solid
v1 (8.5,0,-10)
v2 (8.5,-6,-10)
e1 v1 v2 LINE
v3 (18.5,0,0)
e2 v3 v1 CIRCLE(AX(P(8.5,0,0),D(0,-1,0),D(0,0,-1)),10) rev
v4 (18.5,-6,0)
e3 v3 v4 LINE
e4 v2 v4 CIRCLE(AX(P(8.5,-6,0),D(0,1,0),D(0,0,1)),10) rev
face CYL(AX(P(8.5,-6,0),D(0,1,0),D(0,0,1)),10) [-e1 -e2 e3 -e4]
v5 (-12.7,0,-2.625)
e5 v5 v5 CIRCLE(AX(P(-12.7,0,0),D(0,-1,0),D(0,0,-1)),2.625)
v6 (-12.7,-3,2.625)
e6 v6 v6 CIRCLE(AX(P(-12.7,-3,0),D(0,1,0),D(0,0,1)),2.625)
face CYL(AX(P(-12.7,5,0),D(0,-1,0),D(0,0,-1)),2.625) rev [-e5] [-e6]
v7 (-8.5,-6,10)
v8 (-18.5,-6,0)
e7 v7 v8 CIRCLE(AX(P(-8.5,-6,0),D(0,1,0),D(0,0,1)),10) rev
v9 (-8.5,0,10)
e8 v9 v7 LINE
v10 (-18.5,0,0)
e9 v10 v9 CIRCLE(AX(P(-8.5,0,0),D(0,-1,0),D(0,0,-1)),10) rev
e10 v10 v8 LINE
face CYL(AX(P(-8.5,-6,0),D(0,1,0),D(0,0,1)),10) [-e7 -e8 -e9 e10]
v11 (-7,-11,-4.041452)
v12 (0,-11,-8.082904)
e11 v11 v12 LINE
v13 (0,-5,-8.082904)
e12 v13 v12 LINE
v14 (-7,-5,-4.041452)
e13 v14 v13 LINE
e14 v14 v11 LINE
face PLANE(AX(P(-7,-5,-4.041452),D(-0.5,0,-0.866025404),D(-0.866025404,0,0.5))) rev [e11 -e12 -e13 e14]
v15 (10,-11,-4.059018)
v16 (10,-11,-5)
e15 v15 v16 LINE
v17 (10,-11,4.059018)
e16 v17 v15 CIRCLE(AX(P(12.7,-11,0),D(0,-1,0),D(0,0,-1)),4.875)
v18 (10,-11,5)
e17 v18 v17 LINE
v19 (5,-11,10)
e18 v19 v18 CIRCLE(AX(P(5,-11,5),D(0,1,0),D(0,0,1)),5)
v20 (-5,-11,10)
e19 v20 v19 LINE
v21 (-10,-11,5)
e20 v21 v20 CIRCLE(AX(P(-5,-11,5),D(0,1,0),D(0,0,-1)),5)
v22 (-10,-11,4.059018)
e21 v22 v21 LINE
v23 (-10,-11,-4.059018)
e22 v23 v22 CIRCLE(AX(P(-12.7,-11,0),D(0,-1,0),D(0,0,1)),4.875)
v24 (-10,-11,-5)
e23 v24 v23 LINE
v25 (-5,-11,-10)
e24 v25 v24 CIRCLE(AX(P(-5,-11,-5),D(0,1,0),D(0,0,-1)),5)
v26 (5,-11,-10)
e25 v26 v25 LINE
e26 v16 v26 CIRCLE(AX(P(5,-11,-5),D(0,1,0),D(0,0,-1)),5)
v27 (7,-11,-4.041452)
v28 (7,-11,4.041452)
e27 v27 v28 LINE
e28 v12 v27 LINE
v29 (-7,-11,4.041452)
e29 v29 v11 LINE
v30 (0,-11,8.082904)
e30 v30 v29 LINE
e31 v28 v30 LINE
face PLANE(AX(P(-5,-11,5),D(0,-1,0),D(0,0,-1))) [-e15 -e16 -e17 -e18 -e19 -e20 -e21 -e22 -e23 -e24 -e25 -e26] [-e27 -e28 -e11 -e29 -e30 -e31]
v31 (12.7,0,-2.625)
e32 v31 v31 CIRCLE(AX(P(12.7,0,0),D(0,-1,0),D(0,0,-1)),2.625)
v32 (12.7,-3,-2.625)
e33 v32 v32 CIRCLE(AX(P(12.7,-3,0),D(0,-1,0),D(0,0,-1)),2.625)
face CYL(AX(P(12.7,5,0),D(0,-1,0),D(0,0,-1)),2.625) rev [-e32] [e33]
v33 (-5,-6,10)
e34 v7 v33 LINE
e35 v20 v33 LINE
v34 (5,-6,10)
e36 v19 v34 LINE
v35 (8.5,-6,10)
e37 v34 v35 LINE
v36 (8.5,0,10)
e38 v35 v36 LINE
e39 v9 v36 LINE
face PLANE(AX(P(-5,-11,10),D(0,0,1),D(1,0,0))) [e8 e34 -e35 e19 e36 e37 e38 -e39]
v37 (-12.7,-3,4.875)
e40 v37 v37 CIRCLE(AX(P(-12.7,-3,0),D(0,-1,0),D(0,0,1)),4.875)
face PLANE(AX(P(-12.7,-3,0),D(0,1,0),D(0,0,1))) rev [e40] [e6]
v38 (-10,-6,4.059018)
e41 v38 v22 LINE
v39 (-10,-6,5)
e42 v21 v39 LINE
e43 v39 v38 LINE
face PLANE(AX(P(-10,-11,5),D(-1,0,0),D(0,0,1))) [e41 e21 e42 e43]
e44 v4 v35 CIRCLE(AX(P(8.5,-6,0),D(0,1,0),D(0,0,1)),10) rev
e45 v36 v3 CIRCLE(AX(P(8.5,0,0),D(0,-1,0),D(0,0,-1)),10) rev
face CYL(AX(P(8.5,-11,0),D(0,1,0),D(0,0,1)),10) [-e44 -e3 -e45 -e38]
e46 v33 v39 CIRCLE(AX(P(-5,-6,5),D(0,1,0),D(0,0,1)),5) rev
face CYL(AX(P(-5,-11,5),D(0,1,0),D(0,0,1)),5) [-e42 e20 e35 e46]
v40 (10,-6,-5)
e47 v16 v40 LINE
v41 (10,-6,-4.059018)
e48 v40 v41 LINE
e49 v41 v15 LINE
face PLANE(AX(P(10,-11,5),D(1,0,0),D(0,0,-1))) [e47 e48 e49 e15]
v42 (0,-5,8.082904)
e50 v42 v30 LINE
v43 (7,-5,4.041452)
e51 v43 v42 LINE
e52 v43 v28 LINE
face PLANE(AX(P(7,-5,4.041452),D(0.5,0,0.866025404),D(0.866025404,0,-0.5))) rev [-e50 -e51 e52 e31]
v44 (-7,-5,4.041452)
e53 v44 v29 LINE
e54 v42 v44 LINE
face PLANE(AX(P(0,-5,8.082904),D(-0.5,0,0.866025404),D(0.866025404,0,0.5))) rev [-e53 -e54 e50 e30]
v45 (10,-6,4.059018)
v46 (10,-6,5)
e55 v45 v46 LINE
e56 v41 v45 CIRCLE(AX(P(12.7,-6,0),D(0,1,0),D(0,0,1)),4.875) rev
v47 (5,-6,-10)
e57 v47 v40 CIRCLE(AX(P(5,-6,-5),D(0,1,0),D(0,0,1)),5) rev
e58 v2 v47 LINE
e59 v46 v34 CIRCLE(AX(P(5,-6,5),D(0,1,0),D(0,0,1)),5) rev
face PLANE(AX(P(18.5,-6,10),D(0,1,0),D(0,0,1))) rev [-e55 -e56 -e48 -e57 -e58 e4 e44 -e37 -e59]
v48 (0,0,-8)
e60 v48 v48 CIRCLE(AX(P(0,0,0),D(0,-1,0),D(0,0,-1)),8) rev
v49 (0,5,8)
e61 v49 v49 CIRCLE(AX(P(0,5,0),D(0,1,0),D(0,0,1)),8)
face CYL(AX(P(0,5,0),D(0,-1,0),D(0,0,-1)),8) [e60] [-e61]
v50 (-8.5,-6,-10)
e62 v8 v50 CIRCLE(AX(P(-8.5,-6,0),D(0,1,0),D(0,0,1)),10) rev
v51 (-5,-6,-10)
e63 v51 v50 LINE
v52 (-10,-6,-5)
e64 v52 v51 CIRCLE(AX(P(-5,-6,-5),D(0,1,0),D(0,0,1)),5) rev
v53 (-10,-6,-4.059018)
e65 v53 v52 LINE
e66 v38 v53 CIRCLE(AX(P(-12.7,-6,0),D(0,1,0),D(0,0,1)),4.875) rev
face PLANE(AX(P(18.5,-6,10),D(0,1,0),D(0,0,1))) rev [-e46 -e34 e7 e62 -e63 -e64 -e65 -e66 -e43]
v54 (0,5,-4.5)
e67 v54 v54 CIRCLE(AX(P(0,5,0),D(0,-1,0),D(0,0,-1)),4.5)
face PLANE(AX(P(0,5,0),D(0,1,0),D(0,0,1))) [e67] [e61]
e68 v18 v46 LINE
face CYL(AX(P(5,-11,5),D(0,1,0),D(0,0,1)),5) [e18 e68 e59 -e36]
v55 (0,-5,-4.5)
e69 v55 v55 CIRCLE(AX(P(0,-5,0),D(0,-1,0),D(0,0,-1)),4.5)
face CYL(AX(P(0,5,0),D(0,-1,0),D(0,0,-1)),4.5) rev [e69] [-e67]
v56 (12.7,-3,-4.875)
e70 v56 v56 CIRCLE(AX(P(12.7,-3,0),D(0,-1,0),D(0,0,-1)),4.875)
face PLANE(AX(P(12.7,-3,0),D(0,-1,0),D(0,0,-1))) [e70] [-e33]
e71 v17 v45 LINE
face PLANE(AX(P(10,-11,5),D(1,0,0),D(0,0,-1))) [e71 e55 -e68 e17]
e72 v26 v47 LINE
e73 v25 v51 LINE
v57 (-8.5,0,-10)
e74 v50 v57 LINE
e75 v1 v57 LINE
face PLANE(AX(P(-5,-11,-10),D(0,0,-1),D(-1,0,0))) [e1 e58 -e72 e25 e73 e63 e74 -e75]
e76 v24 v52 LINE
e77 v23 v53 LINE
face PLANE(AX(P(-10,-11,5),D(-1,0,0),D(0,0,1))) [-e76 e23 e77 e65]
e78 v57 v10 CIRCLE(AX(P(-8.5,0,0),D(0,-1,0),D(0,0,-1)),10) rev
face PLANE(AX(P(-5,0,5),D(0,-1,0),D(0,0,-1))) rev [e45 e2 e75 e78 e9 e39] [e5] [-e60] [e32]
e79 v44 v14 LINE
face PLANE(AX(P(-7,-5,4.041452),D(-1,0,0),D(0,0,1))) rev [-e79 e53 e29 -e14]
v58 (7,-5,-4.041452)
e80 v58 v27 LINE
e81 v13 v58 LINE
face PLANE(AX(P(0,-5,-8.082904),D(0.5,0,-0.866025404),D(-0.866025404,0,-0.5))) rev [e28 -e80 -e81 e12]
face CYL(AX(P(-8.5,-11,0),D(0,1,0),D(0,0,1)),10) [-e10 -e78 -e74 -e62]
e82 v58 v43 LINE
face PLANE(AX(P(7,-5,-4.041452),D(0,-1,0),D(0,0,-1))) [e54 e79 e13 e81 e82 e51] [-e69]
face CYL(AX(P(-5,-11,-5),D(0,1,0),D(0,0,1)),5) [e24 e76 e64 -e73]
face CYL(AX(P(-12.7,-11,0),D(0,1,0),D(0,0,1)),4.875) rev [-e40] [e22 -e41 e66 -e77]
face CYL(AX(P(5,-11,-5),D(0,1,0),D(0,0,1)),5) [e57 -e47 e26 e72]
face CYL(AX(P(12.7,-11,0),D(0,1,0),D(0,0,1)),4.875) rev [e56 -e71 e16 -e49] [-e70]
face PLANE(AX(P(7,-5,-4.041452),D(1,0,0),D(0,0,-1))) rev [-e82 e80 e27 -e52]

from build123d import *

# Parameters (mm, degrees)
BOSS_EXTRUDE1_DEPTH     = 11
SKETCH2_W               = 37
SKETCH2_H               = 20
BOSS_EXTRUDE2_DEPTH     = 6
SKETCH8_R               = 8
BOSS_EXTRUDE3_DEPTH     = 5
CUT_EXTRUDE1_DEPTH      = 24.732888573
CUT_EXTRUDE1_DEPTH_BACK = 3
SKETCH4_R               = 4.875
SKETCH5_R               = 2.625
CUT_EXTRUDE2_DEPTH      = 24.732888573
CUT_EXTRUDE3_DEPTH      = 6
SKETCH7_R               = 4.5
CUT_EXTRUDE4_DEPTH      = 24.286262044
FILLET2_R               = 10


with BuildPart() as part:
    # Sketch1 → Boss-Extrude1 (new body)
    with BuildSketch(Plane(origin=(0, 0, 0), x_dir=(1, 0, 0), z_dir=(0, 1, 0))):
        with BuildLine():
            Line((-5, -10), (5, -10))
            ThreePointArc((5, -10), (8.535533906, -8.535533906), (10, -5))
            Line((10, -5), (10, 5))
            ThreePointArc((10, 5), (8.535533906, 8.535533906), (5, 10))
            Line((5, 10), (-5, 10))
            ThreePointArc((-5, 10), (-8.535533906, 8.535533906), (-10, 5))
            Line((-10, 5), (-10, -5))
            ThreePointArc((-10, -5), (-8.535533906, -8.535533906), (-5, -10))
        make_face()
    extrude(amount=-BOSS_EXTRUDE1_DEPTH)

    # Sketch2 → Boss-Extrude2 (add)
    with BuildSketch(Plane(origin=(0, 0, 0), x_dir=(1, 0, 0), z_dir=(0, 1, 0))):
        Rectangle(SKETCH2_W, SKETCH2_H)
    extrude(amount=-BOSS_EXTRUDE2_DEPTH)

    # Sketch8 → Boss-Extrude3 (add)
    with BuildSketch(Plane(origin=(0, 0, 0), x_dir=(1, 0, 0), z_dir=(0, 1, 0))):
        with Locations(Location((0, 0, 0), (0, 0, 90))):
            Circle(SKETCH8_R)
    extrude(amount=BOSS_EXTRUDE3_DEPTH)

    # Sketch4 → Cut-Extrude1 (cut, two sides: drawn at the far end of the back side and taken through both)
    with BuildSketch(Plane(origin=(0, -6, 0), x_dir=(-1, 0, 0), z_dir=(0, -1, 0)).offset(-CUT_EXTRUDE1_DEPTH_BACK)):
        with Locations(Location((-12.7, 0, 0), (0, 0, 303.631277448))):
            Circle(SKETCH4_R)
        with Locations(Location((12.7, 0, 0), (0, 0, 270))):
            Circle(SKETCH4_R)
    extrude(amount=CUT_EXTRUDE1_DEPTH + CUT_EXTRUDE1_DEPTH_BACK, mode=Mode.SUBTRACT)

    # Sketch5 → Cut-Extrude2 (cut, through all)
    with BuildSketch(Plane(origin=(0, -6, 0), x_dir=(-1, 0, 0), z_dir=(0, -1, 0))):
        with Locations(Location((-12.7, 0, 0), (0, 0, 90))):
            Circle(SKETCH5_R)
        with Locations(Location((12.7, 0, 0), (0, 0, 90))):
            Circle(SKETCH5_R)
    extrude(amount=-CUT_EXTRUDE2_DEPTH, mode=Mode.SUBTRACT)

    # Sketch6 → Cut-Extrude3 (cut)
    with BuildSketch(Plane.XZ.offset(11)):
        Polygon((7, -4.041451884), (7, 4.041451884), (0, 8.082903769), (-7, 4.041451884), (-7, -4.041451884), (0, -8.082903769), align=None)
    extrude(amount=-CUT_EXTRUDE3_DEPTH, mode=Mode.SUBTRACT)

    # Sketch7 → Cut-Extrude4 (cut, through all)
    with BuildSketch(Plane.XZ.offset(5)):
        with Locations(Location((0, 0, 0), (0, 0, 270))):
            Circle(SKETCH7_R)
    extrude(amount=-CUT_EXTRUDE4_DEPTH, mode=Mode.SUBTRACT)

    # Fillet2
    fillet2_edges = [part.edges().sort_by_distance(p)[0] for p in [
        (-18.5, -3, 10),
        (-18.5, -3, -10),
        (18.5, -3, -10),
        (18.5, -3, 10),
    ]]
    fillet(fillet2_edges, radius=FILLET2_R - 0.0001)  # a hair under: the kernel refuses the full size


solid = part.part
